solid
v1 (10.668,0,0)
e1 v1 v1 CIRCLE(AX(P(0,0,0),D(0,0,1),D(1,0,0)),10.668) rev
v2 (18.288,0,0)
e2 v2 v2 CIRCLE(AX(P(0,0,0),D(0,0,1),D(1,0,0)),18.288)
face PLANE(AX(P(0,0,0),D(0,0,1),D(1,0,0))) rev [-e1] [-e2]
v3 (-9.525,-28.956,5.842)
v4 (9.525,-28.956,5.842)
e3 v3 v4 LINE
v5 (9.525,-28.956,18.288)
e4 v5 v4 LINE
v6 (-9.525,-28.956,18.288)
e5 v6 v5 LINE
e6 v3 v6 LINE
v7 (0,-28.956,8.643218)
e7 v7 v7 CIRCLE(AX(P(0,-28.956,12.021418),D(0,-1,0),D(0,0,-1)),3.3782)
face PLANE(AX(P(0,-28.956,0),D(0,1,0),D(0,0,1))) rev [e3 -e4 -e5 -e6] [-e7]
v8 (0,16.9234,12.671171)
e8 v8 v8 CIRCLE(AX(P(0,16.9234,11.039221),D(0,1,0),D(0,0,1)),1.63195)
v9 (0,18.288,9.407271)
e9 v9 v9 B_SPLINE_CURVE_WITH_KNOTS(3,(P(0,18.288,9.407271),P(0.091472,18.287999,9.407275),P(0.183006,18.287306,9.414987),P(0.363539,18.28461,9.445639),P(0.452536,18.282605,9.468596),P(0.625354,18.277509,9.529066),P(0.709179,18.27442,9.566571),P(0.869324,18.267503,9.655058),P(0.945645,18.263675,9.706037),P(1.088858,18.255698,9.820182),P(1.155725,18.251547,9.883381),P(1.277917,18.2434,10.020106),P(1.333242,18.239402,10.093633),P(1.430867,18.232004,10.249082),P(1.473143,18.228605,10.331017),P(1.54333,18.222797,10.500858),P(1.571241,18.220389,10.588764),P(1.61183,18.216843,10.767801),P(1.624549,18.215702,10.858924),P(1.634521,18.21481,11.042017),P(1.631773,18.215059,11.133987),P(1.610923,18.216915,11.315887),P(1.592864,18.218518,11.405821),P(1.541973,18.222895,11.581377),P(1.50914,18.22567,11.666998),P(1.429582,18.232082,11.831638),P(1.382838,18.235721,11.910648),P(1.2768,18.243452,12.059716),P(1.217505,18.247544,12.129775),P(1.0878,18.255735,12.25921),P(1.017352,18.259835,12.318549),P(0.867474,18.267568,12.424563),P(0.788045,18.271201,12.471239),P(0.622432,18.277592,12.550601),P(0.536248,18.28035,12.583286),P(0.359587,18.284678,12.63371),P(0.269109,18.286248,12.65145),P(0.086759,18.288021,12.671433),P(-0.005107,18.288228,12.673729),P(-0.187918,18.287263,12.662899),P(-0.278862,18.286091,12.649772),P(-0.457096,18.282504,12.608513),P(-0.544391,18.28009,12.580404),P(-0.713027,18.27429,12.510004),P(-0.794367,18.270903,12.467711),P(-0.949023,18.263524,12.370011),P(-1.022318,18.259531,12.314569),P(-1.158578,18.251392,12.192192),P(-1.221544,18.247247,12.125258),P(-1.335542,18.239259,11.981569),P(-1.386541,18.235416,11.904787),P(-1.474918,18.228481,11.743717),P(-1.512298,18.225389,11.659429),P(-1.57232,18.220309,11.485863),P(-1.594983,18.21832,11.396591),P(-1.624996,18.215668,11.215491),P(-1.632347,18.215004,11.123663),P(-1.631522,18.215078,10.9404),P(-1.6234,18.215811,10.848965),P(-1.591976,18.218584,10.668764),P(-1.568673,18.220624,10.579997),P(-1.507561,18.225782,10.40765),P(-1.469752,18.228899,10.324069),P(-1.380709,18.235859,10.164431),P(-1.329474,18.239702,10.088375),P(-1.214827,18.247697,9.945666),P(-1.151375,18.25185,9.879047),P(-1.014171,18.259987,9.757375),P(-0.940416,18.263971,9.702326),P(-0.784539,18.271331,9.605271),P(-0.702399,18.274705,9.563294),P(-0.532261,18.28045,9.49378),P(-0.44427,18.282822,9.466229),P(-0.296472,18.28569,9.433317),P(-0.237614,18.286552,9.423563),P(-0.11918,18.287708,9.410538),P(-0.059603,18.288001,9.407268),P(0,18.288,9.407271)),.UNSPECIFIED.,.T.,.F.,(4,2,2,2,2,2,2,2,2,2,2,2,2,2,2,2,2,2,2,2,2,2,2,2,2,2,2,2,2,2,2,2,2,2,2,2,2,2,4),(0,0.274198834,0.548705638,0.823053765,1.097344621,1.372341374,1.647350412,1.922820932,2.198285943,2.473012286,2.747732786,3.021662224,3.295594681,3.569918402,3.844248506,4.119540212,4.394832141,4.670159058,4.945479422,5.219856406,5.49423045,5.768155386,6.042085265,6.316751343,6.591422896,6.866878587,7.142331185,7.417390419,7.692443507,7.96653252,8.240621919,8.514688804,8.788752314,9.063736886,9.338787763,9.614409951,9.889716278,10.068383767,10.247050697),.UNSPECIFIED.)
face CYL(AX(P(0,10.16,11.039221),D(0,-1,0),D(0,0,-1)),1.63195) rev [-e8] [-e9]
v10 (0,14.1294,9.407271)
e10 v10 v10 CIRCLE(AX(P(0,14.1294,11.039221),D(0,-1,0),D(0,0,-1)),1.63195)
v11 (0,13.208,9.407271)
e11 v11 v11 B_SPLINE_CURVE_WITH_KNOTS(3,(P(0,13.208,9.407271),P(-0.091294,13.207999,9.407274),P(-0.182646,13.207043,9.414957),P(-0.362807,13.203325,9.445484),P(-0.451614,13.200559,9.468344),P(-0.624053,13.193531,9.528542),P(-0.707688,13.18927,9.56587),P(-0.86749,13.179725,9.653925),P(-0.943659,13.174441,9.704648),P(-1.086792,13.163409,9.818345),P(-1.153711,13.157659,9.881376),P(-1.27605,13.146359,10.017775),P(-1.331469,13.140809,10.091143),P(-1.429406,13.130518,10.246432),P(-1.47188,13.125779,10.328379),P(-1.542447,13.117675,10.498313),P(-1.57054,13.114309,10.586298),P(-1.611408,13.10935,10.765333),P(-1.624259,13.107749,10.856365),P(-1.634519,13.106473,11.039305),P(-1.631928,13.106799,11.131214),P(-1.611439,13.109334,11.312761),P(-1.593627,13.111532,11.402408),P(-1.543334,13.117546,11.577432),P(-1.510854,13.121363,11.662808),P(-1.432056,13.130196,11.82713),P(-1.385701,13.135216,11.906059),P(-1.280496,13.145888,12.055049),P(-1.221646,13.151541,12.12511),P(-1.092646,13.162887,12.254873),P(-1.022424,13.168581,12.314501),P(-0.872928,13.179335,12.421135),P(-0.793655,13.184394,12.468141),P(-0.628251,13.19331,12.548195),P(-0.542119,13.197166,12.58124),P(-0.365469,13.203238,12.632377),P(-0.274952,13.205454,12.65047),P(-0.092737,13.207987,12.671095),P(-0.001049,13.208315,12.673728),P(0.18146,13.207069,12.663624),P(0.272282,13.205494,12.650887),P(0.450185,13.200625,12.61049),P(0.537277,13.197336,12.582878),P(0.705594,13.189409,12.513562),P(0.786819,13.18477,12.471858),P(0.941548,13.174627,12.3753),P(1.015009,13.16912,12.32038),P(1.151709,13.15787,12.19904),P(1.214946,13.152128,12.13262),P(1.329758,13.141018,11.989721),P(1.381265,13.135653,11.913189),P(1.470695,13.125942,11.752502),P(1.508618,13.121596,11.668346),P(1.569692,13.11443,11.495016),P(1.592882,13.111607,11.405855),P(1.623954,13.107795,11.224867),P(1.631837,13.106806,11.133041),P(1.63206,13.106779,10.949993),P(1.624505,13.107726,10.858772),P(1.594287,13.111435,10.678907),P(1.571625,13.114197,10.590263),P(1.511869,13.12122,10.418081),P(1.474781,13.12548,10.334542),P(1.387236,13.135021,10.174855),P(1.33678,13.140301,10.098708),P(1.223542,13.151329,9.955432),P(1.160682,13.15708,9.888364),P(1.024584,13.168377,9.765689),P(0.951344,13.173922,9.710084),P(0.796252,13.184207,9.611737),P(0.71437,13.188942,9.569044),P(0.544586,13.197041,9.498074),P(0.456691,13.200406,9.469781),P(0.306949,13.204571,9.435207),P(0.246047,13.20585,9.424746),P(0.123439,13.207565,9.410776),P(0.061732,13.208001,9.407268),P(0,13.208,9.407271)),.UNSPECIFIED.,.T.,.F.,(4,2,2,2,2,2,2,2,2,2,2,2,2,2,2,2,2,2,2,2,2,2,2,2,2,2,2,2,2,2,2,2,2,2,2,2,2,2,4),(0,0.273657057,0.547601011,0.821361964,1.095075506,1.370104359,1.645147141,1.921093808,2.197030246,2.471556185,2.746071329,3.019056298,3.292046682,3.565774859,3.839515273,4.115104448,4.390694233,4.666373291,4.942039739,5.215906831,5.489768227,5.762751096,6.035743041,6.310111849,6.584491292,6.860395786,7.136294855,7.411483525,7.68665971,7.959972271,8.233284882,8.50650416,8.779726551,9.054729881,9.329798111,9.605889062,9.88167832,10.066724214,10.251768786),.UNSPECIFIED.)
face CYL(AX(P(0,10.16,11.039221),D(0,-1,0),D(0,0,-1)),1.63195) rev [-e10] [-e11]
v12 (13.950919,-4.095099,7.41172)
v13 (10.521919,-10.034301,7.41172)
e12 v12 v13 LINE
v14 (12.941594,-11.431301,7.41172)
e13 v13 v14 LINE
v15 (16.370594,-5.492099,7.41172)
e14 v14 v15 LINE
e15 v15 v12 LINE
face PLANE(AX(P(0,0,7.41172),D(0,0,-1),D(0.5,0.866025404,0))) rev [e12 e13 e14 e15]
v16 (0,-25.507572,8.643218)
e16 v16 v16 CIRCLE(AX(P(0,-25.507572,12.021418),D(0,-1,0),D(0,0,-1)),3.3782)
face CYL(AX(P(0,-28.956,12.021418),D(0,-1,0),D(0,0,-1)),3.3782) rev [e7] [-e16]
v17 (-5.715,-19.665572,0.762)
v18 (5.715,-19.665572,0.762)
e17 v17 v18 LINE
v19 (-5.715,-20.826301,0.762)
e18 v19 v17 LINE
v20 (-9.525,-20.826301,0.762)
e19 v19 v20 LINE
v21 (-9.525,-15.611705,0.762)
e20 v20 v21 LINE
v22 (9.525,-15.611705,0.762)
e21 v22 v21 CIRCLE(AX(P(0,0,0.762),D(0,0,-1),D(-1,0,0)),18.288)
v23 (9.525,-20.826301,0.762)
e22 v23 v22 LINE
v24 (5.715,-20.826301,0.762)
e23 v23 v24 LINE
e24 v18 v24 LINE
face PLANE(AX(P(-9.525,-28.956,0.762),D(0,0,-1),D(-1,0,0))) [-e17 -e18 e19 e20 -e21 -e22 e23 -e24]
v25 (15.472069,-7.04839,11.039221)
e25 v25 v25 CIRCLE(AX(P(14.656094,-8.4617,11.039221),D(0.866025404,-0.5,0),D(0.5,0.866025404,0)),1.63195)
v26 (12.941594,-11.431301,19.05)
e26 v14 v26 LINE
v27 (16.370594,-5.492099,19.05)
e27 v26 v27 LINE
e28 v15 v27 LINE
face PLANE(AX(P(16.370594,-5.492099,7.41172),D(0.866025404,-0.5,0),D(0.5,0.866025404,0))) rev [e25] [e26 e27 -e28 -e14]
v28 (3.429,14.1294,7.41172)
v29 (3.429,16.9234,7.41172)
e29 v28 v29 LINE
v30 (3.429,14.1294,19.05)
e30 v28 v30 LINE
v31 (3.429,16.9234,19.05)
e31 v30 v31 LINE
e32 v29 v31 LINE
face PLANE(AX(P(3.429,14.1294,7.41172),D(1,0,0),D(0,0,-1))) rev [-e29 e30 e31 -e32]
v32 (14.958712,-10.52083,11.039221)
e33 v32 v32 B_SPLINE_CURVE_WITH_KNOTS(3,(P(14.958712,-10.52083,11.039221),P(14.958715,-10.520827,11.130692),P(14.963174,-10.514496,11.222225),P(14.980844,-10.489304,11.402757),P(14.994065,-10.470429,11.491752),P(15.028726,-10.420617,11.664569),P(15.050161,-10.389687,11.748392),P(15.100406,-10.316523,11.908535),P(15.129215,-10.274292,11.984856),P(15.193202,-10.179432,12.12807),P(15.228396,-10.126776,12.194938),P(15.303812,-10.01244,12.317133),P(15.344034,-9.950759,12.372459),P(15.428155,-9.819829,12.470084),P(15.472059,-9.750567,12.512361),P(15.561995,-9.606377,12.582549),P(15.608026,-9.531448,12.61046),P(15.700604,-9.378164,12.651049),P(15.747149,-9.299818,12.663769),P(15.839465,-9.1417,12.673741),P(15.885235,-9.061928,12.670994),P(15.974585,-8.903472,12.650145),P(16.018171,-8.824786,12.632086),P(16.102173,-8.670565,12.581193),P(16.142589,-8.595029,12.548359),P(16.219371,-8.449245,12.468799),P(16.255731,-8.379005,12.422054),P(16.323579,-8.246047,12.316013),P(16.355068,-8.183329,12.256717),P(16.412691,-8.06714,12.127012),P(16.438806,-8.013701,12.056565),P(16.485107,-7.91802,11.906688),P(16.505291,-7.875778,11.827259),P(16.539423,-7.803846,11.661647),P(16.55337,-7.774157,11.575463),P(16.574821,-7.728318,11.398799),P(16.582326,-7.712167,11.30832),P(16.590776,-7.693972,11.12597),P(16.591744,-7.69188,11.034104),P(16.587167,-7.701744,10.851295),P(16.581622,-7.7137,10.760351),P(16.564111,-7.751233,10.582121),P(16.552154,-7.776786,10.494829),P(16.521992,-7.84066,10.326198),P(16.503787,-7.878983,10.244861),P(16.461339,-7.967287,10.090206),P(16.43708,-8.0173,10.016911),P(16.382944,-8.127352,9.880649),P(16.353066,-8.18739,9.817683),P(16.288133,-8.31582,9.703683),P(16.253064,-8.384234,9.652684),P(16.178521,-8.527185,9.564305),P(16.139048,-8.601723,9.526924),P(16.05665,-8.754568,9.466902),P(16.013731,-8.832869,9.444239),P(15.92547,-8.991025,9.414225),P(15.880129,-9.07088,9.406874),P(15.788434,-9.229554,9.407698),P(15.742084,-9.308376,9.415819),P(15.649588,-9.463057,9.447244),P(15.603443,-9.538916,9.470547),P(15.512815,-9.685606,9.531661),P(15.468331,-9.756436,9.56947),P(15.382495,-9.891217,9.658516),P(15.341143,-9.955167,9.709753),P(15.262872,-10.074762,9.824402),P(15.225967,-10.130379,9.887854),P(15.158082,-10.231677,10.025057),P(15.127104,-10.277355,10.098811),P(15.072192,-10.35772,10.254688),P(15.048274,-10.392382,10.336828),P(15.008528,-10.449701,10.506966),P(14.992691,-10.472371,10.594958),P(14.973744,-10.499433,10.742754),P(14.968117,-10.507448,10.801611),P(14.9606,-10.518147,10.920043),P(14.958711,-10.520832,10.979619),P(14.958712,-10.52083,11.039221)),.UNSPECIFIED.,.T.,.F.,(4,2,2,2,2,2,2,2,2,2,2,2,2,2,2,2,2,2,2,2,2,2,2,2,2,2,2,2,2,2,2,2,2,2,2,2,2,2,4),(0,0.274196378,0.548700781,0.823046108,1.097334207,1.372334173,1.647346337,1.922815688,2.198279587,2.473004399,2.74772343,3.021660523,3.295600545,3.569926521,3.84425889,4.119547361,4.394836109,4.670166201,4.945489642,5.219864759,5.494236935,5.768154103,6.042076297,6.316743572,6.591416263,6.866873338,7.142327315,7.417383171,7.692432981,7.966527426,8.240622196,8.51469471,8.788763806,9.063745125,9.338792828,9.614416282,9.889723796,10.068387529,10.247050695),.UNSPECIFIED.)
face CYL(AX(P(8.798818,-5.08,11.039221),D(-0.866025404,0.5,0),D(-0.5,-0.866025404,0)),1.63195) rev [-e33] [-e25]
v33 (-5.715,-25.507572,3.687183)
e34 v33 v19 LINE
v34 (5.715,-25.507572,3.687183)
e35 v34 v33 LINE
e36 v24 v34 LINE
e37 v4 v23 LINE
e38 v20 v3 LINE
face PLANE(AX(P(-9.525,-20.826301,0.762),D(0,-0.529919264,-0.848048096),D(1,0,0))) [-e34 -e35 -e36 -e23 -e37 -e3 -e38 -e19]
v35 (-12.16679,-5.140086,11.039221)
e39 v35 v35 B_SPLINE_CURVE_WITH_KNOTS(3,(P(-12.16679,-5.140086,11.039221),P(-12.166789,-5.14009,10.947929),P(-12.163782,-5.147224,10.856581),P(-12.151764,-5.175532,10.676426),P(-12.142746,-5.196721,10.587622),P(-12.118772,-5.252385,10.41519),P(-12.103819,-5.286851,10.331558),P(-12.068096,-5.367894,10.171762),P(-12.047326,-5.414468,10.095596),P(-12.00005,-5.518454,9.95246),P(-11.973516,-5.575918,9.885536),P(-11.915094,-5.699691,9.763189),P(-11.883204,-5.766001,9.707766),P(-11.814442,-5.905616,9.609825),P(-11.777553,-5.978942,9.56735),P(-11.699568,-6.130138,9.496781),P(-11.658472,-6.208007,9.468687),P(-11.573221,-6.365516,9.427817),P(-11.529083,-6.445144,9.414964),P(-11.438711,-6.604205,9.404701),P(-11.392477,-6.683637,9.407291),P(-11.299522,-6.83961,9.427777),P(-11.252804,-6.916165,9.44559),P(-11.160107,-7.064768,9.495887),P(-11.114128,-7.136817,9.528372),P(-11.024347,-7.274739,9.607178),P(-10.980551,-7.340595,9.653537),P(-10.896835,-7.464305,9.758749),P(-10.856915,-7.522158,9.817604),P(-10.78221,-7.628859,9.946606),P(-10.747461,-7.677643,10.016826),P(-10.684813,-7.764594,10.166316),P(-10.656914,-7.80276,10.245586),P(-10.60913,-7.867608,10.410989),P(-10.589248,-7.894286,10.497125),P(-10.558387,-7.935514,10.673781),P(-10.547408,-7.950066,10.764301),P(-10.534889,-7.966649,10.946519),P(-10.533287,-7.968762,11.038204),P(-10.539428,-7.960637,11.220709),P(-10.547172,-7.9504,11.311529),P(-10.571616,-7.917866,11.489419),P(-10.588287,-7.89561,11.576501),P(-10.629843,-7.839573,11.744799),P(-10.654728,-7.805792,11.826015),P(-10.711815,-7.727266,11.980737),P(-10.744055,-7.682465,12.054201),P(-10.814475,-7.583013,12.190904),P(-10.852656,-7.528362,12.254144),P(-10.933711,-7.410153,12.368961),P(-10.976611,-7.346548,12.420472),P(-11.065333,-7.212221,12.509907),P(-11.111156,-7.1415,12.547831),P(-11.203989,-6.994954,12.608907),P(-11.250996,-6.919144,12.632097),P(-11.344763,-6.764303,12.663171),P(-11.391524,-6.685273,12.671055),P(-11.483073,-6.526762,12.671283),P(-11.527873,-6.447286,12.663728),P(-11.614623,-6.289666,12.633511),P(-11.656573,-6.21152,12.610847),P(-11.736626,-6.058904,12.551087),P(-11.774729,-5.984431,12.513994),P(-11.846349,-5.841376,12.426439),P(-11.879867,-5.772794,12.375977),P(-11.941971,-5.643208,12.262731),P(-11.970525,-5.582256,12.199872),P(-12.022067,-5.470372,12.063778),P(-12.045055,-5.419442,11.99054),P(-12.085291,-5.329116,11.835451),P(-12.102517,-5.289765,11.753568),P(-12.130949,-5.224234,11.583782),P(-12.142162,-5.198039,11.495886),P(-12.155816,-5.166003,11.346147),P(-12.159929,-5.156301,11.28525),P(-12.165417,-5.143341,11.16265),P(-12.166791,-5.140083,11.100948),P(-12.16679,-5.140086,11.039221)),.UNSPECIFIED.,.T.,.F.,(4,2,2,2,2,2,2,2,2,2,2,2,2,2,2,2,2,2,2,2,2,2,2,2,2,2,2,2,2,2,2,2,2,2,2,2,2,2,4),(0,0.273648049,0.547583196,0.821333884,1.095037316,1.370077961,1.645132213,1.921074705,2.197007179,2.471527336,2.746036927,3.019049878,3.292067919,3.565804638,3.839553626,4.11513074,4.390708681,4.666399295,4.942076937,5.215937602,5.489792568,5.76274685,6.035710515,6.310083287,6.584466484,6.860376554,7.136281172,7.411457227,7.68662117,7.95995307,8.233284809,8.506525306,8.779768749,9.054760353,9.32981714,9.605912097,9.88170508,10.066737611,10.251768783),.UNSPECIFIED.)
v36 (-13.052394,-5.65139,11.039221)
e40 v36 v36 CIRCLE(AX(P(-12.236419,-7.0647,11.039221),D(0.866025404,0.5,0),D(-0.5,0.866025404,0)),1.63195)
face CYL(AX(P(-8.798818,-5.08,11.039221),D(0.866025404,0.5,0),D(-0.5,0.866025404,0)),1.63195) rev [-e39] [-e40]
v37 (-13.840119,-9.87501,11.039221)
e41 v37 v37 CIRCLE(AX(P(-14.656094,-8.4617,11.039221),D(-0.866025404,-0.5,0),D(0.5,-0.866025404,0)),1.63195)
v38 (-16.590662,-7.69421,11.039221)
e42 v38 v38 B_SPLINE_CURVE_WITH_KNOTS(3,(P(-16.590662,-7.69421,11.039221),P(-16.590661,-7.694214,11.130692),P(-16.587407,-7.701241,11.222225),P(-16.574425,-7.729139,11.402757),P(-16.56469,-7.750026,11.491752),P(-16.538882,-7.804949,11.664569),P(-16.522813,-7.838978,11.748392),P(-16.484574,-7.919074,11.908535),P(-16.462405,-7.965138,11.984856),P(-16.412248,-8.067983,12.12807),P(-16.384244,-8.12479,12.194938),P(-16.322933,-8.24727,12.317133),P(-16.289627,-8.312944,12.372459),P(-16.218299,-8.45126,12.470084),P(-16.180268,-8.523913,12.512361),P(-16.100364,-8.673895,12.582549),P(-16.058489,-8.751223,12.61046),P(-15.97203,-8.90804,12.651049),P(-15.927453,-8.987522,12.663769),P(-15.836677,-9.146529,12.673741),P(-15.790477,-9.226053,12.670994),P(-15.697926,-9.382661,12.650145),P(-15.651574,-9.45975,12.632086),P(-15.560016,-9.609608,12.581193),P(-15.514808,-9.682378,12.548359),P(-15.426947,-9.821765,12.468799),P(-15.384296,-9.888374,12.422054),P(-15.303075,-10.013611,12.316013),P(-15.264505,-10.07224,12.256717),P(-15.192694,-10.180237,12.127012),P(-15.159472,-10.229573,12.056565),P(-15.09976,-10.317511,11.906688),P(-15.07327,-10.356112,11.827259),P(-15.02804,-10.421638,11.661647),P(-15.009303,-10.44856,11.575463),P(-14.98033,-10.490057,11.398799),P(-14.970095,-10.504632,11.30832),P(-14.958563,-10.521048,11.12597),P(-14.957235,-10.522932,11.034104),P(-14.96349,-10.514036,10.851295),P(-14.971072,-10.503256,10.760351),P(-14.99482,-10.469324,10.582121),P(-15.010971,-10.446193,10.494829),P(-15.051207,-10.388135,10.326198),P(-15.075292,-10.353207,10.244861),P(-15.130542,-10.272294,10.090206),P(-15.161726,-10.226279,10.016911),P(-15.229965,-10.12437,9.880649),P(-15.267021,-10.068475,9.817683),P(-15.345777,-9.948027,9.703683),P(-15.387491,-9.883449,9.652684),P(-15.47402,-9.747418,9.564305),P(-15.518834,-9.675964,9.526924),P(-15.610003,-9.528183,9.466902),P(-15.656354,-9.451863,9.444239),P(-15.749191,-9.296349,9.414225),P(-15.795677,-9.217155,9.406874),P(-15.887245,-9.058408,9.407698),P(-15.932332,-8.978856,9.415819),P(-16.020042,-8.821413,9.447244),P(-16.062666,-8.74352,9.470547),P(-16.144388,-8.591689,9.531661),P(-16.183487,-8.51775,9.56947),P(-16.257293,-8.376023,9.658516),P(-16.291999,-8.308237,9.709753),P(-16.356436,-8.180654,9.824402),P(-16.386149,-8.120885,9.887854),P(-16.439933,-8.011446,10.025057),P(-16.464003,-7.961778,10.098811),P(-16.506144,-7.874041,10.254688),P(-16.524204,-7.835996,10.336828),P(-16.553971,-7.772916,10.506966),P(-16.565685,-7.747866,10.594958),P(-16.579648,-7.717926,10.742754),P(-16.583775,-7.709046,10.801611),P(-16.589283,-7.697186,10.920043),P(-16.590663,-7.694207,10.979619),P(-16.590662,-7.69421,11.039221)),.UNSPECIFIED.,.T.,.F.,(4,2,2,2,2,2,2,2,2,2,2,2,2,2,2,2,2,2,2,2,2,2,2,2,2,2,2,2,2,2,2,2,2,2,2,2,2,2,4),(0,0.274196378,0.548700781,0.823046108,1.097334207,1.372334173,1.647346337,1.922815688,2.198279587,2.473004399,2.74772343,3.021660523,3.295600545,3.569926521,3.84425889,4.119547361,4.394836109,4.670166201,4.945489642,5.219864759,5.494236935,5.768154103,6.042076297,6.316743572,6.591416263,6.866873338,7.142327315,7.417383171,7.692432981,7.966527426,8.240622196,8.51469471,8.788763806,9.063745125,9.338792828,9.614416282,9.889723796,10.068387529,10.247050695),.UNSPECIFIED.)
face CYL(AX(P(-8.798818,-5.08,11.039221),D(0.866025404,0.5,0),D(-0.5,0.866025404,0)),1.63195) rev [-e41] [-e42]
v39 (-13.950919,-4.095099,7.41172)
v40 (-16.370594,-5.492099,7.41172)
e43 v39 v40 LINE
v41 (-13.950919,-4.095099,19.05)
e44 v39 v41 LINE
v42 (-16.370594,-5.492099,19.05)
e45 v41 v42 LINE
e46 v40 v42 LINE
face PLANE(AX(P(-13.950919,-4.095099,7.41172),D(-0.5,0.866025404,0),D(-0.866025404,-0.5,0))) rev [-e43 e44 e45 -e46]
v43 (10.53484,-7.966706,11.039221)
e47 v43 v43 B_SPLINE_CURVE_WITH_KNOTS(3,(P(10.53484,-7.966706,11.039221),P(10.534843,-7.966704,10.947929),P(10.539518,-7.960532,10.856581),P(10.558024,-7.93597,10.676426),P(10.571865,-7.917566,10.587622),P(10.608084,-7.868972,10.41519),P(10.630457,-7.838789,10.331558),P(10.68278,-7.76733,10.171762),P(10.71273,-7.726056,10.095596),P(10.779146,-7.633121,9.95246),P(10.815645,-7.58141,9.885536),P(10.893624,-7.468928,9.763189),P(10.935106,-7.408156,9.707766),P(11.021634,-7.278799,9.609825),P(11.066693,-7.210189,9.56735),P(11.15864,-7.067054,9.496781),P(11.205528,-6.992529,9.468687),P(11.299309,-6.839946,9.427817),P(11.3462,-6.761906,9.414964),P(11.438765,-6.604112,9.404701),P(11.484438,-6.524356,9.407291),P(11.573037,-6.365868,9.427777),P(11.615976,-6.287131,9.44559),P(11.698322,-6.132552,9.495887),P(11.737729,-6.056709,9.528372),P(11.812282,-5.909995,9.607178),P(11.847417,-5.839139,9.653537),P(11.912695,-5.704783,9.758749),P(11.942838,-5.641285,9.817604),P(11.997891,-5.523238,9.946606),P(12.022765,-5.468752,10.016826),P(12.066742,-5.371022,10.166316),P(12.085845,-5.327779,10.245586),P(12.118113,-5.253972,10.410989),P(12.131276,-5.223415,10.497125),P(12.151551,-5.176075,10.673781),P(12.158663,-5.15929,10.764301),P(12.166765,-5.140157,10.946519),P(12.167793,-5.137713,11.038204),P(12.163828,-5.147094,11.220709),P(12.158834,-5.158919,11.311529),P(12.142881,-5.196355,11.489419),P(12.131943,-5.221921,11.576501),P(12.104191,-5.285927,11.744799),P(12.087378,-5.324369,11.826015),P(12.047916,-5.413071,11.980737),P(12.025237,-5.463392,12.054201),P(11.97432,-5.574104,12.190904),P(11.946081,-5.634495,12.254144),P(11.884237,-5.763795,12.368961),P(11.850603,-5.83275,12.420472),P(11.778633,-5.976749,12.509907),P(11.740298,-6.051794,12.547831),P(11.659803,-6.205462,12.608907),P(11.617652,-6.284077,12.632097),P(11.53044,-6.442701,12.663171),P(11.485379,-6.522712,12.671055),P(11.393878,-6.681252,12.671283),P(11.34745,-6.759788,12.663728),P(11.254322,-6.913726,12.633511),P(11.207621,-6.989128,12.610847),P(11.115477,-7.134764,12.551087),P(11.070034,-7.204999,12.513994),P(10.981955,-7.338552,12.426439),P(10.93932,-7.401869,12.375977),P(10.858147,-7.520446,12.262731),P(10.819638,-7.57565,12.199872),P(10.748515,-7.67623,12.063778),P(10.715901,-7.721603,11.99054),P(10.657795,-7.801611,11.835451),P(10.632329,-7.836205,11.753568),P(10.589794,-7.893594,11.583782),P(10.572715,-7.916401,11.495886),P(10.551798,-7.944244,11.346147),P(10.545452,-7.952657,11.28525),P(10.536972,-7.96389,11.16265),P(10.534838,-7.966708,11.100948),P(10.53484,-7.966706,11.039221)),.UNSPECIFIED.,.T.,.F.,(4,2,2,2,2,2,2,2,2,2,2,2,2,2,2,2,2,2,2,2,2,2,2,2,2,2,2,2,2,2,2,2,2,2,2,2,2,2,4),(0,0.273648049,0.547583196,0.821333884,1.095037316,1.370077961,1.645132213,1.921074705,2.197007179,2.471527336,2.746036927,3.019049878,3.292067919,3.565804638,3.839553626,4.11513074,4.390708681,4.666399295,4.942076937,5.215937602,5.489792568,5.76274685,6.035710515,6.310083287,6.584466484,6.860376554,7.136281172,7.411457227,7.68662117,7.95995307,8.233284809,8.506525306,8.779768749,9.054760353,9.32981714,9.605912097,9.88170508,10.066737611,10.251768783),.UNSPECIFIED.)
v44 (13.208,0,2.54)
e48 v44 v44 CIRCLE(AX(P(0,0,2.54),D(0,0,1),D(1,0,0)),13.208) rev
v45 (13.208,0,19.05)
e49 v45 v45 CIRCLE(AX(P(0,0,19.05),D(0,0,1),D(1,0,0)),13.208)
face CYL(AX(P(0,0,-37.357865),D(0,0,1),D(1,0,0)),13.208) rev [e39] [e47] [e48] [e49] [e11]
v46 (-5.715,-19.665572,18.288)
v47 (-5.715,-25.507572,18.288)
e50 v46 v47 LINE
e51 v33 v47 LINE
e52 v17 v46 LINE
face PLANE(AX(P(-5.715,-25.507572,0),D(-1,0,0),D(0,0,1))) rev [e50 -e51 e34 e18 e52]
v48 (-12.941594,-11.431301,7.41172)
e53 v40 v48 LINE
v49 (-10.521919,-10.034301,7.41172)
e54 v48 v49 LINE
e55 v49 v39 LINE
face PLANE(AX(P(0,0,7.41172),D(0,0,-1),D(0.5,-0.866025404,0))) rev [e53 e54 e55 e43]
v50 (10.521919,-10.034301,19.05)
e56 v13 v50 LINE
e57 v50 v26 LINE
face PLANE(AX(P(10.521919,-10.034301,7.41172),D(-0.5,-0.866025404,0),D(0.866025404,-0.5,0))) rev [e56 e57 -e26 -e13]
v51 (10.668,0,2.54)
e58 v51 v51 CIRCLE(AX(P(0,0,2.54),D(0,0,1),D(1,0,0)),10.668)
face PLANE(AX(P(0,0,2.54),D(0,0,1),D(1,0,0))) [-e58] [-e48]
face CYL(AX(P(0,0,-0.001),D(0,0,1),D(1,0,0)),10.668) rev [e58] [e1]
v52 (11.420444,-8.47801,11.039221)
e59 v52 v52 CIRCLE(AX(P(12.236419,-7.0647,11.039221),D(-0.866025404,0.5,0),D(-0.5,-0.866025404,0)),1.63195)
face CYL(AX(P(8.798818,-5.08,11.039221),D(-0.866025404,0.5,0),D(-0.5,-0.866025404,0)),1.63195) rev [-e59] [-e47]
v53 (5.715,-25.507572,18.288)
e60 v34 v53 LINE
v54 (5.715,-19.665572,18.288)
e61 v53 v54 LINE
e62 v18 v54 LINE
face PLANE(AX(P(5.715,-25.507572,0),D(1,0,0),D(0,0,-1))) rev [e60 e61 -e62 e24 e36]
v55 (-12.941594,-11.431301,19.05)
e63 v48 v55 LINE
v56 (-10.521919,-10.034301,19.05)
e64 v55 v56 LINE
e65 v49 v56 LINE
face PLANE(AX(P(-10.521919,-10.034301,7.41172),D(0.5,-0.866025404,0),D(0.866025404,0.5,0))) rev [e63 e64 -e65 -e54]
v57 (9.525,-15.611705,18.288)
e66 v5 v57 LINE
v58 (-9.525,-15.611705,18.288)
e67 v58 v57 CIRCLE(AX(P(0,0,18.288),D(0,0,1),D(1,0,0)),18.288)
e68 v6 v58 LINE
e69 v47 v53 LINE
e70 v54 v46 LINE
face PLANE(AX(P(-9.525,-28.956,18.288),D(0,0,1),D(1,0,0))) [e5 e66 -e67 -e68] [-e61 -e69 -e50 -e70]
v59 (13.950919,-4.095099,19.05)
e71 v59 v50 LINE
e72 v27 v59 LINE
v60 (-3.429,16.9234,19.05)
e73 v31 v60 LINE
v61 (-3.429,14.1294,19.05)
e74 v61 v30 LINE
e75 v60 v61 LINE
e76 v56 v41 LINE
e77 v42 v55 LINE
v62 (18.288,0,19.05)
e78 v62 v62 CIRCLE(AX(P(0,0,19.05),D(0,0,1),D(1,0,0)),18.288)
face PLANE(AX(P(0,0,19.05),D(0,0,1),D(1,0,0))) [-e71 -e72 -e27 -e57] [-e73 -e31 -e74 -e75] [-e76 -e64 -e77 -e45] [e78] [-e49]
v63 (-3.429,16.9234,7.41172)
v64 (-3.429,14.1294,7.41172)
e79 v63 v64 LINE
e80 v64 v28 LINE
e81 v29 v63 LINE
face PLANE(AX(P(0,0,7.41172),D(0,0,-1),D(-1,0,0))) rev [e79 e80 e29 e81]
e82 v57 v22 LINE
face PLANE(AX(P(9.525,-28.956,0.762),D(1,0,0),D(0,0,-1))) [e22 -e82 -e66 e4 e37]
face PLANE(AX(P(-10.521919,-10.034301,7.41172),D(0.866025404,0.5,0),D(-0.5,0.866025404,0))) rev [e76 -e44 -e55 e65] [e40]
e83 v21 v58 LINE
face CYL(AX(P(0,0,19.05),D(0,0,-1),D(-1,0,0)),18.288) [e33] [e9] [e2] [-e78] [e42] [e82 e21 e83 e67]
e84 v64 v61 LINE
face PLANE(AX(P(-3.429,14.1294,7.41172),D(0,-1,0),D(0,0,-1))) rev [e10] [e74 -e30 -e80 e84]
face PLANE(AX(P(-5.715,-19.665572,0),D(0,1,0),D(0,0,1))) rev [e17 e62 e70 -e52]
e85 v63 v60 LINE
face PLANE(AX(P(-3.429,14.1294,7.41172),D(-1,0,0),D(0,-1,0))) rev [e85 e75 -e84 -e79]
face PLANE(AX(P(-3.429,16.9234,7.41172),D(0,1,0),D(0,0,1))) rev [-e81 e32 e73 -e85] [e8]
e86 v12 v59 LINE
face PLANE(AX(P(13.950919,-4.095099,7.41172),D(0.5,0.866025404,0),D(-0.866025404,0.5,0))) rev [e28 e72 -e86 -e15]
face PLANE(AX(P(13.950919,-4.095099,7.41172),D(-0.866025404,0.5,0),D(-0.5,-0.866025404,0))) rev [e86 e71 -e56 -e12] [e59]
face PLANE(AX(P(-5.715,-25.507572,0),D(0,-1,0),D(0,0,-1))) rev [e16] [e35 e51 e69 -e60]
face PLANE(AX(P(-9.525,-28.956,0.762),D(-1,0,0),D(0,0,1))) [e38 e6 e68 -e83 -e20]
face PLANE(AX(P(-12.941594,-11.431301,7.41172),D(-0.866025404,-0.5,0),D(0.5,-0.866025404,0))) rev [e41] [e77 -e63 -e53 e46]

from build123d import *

# Parameters (mm, degrees)
SKETCH1_R                   = 18.288
BOSS_EXTRUDE1_DEPTH         = 19.05
SKETCH3_R                   = 13.208
CUT_EXTRUDE1_DEPTH          = 16.51
CUT_EXTRUDE2_REACH          = 32.684
SKETCH6_R                   = 10.668
SKETCH10_W                  = 6.858
SKETCH10_H                  = 2.794
CUT_EXTRUDE3_DEPTH          = 11.63828
CIRPATTERN1_COUNT           = 3
CIRPATTERN2_COUNT           = 3
SKETCH15_W                  = 19.05
SKETCH15_H                  = 17.526
BOSS_EXTRUDE3_DEPTH         = 15.24
SKETCH16_W                  = 11.43
SKETCH16_H                  = 5.842
CUT_EXTRUDE4_DEPTH          = 39.824629185
CHAMFER1_SIZE               = 8.129699408
CHAMFER1_SIZE_2             = 5.08
F_1_4_CLEARANCE_HOLE1_D     = 6.7564
F_1_4_CLEARANCE_HOLE1_DEPTH = 3.448428068


with BuildPart() as part:
    # Sketch1 → Boss-Extrude1 (new body)
    with BuildSketch(Plane.XY):
        with Locations(Location((0, 0, 0), (0, 0, 180))):
            Circle(SKETCH1_R)
    extrude(amount=BOSS_EXTRUDE1_DEPTH)

    # Sketch3 → Cut-Extrude1 (cut)
    with BuildSketch(Plane.XY.offset(19.05)):
        Circle(SKETCH3_R)
    extrude(amount=-CUT_EXTRUDE1_DEPTH, mode=Mode.SUBTRACT)

    # Sketch6 → Cut-Extrude2 (cut, up to next)
    with BuildSketch(Plane.XY.offset(2.54), mode=Mode.PRIVATE) as cut_extrude2_sk1:
        Circle(SKETCH6_R)
    cut_extrude2_tool1 = extrude(cut_extrude2_sk1.sketch, amount=-CUT_EXTRUDE2_REACH, mode=Mode.PRIVATE) & part.part
    add(cut_extrude2_tool1.solids().sort_by_distance((0, 0, 2.54))[0], mode=Mode.SUBTRACT)

    # Sketch10 → Cut-Extrude3 (cut)
    with BuildSketch(Plane.XY.offset(19.05)):
        with Locations((0, 15.526400014)):
            Rectangle(SKETCH10_W, SKETCH10_H)
    cut_extrude3 = extrude(amount=-CUT_EXTRUDE3_DEPTH, mode=Mode.SUBTRACT)

    # CirPattern1: Cut-Extrude3 ×3 about axis
    cirpattern1_axis = Axis((0, 0, 0), (0, 0, 1))
    for i in range(1, CIRPATTERN1_COUNT):
        add(cut_extrude3.rotate(cirpattern1_axis, i * 360 / CIRPATTERN1_COUNT), mode=Mode.SUBTRACT)

    # Sketch13 → #4 Clearance Hole1 (revolve, cut)
    with BuildSketch(Plane(origin=(0, 10.16, 11.039220548), x_dir=(0, 0, -1), z_dir=(1, 0, 0))):
        Polygon((0, 0), (0, 13.680574487), (1.63195, 12.7), (1.63195, 0), align=None)
    f_4_clearance_hole1 = revolve(axis=Axis((0, 3.81, 11.039220548), (0, 1, 0)), mode=Mode.SUBTRACT)

    # CirPattern2: #4 Clearance Hole1 ×3 about axis
    cirpattern2_axis = Axis((0, 0, 19.05), (0, 0, -1))
    for i in range(1, CIRPATTERN2_COUNT):
        add(f_4_clearance_hole1.rotate(cirpattern2_axis, i * 360 / CIRPATTERN2_COUNT), mode=Mode.SUBTRACT)

    # Sketch15 → Boss-Extrude3 (add)
    with BuildSketch(Plane(origin=(0, -13.716, 0), x_dir=(1, 0, 0), z_dir=(0, 1, 0))):
        with Locations((0, -9.525)):
            Rectangle(SKETCH15_W, SKETCH15_H)
    extrude(amount=-BOSS_EXTRUDE3_DEPTH)

    # Sketch16 → Cut-Extrude4 (cut, through all)
    with BuildSketch(Plane.XY.offset(18.288)):
        with Locations((0, -22.586571932)):
            Rectangle(SKETCH16_W, SKETCH16_H)
    extrude(amount=-CUT_EXTRUDE4_DEPTH, mode=Mode.SUBTRACT)

    # Chamfer1
    # the kernel refuses this chamfer: 8.129699408, 5.08 mm, written as the material it takes off along each edge
    with BuildSketch(Plane(origin=(-30.543101737, -28.956, 0.762), x_dir=(0, 0.9997899140358644, -0.020497019104217945), z_dir=(1, 0, 0))) as chamfer1_piece_1:
        Polygon((CHAMFER1_SIZE * 0.999789913978, CHAMFER1_SIZE * 0.020497019103), (-CHAMFER1_SIZE_2 * 0.0204970191042, CHAMFER1_SIZE_2 * 0.999789914036), (0, 0), align=None)
    extrude(amount=61.086203475, mode=Mode.SUBTRACT)

    # 1/4 Clearance Hole1
    with Locations(Plane(origin=(0, -28.956, 0), x_dir=(-1, 0, 0), z_dir=(0, -1, 0))):
        with Locations((0, -12.021417661)):
            Hole(F_1_4_CLEARANCE_HOLE1_D / 2, depth=F_1_4_CLEARANCE_HOLE1_DEPTH)


solid = part.part
